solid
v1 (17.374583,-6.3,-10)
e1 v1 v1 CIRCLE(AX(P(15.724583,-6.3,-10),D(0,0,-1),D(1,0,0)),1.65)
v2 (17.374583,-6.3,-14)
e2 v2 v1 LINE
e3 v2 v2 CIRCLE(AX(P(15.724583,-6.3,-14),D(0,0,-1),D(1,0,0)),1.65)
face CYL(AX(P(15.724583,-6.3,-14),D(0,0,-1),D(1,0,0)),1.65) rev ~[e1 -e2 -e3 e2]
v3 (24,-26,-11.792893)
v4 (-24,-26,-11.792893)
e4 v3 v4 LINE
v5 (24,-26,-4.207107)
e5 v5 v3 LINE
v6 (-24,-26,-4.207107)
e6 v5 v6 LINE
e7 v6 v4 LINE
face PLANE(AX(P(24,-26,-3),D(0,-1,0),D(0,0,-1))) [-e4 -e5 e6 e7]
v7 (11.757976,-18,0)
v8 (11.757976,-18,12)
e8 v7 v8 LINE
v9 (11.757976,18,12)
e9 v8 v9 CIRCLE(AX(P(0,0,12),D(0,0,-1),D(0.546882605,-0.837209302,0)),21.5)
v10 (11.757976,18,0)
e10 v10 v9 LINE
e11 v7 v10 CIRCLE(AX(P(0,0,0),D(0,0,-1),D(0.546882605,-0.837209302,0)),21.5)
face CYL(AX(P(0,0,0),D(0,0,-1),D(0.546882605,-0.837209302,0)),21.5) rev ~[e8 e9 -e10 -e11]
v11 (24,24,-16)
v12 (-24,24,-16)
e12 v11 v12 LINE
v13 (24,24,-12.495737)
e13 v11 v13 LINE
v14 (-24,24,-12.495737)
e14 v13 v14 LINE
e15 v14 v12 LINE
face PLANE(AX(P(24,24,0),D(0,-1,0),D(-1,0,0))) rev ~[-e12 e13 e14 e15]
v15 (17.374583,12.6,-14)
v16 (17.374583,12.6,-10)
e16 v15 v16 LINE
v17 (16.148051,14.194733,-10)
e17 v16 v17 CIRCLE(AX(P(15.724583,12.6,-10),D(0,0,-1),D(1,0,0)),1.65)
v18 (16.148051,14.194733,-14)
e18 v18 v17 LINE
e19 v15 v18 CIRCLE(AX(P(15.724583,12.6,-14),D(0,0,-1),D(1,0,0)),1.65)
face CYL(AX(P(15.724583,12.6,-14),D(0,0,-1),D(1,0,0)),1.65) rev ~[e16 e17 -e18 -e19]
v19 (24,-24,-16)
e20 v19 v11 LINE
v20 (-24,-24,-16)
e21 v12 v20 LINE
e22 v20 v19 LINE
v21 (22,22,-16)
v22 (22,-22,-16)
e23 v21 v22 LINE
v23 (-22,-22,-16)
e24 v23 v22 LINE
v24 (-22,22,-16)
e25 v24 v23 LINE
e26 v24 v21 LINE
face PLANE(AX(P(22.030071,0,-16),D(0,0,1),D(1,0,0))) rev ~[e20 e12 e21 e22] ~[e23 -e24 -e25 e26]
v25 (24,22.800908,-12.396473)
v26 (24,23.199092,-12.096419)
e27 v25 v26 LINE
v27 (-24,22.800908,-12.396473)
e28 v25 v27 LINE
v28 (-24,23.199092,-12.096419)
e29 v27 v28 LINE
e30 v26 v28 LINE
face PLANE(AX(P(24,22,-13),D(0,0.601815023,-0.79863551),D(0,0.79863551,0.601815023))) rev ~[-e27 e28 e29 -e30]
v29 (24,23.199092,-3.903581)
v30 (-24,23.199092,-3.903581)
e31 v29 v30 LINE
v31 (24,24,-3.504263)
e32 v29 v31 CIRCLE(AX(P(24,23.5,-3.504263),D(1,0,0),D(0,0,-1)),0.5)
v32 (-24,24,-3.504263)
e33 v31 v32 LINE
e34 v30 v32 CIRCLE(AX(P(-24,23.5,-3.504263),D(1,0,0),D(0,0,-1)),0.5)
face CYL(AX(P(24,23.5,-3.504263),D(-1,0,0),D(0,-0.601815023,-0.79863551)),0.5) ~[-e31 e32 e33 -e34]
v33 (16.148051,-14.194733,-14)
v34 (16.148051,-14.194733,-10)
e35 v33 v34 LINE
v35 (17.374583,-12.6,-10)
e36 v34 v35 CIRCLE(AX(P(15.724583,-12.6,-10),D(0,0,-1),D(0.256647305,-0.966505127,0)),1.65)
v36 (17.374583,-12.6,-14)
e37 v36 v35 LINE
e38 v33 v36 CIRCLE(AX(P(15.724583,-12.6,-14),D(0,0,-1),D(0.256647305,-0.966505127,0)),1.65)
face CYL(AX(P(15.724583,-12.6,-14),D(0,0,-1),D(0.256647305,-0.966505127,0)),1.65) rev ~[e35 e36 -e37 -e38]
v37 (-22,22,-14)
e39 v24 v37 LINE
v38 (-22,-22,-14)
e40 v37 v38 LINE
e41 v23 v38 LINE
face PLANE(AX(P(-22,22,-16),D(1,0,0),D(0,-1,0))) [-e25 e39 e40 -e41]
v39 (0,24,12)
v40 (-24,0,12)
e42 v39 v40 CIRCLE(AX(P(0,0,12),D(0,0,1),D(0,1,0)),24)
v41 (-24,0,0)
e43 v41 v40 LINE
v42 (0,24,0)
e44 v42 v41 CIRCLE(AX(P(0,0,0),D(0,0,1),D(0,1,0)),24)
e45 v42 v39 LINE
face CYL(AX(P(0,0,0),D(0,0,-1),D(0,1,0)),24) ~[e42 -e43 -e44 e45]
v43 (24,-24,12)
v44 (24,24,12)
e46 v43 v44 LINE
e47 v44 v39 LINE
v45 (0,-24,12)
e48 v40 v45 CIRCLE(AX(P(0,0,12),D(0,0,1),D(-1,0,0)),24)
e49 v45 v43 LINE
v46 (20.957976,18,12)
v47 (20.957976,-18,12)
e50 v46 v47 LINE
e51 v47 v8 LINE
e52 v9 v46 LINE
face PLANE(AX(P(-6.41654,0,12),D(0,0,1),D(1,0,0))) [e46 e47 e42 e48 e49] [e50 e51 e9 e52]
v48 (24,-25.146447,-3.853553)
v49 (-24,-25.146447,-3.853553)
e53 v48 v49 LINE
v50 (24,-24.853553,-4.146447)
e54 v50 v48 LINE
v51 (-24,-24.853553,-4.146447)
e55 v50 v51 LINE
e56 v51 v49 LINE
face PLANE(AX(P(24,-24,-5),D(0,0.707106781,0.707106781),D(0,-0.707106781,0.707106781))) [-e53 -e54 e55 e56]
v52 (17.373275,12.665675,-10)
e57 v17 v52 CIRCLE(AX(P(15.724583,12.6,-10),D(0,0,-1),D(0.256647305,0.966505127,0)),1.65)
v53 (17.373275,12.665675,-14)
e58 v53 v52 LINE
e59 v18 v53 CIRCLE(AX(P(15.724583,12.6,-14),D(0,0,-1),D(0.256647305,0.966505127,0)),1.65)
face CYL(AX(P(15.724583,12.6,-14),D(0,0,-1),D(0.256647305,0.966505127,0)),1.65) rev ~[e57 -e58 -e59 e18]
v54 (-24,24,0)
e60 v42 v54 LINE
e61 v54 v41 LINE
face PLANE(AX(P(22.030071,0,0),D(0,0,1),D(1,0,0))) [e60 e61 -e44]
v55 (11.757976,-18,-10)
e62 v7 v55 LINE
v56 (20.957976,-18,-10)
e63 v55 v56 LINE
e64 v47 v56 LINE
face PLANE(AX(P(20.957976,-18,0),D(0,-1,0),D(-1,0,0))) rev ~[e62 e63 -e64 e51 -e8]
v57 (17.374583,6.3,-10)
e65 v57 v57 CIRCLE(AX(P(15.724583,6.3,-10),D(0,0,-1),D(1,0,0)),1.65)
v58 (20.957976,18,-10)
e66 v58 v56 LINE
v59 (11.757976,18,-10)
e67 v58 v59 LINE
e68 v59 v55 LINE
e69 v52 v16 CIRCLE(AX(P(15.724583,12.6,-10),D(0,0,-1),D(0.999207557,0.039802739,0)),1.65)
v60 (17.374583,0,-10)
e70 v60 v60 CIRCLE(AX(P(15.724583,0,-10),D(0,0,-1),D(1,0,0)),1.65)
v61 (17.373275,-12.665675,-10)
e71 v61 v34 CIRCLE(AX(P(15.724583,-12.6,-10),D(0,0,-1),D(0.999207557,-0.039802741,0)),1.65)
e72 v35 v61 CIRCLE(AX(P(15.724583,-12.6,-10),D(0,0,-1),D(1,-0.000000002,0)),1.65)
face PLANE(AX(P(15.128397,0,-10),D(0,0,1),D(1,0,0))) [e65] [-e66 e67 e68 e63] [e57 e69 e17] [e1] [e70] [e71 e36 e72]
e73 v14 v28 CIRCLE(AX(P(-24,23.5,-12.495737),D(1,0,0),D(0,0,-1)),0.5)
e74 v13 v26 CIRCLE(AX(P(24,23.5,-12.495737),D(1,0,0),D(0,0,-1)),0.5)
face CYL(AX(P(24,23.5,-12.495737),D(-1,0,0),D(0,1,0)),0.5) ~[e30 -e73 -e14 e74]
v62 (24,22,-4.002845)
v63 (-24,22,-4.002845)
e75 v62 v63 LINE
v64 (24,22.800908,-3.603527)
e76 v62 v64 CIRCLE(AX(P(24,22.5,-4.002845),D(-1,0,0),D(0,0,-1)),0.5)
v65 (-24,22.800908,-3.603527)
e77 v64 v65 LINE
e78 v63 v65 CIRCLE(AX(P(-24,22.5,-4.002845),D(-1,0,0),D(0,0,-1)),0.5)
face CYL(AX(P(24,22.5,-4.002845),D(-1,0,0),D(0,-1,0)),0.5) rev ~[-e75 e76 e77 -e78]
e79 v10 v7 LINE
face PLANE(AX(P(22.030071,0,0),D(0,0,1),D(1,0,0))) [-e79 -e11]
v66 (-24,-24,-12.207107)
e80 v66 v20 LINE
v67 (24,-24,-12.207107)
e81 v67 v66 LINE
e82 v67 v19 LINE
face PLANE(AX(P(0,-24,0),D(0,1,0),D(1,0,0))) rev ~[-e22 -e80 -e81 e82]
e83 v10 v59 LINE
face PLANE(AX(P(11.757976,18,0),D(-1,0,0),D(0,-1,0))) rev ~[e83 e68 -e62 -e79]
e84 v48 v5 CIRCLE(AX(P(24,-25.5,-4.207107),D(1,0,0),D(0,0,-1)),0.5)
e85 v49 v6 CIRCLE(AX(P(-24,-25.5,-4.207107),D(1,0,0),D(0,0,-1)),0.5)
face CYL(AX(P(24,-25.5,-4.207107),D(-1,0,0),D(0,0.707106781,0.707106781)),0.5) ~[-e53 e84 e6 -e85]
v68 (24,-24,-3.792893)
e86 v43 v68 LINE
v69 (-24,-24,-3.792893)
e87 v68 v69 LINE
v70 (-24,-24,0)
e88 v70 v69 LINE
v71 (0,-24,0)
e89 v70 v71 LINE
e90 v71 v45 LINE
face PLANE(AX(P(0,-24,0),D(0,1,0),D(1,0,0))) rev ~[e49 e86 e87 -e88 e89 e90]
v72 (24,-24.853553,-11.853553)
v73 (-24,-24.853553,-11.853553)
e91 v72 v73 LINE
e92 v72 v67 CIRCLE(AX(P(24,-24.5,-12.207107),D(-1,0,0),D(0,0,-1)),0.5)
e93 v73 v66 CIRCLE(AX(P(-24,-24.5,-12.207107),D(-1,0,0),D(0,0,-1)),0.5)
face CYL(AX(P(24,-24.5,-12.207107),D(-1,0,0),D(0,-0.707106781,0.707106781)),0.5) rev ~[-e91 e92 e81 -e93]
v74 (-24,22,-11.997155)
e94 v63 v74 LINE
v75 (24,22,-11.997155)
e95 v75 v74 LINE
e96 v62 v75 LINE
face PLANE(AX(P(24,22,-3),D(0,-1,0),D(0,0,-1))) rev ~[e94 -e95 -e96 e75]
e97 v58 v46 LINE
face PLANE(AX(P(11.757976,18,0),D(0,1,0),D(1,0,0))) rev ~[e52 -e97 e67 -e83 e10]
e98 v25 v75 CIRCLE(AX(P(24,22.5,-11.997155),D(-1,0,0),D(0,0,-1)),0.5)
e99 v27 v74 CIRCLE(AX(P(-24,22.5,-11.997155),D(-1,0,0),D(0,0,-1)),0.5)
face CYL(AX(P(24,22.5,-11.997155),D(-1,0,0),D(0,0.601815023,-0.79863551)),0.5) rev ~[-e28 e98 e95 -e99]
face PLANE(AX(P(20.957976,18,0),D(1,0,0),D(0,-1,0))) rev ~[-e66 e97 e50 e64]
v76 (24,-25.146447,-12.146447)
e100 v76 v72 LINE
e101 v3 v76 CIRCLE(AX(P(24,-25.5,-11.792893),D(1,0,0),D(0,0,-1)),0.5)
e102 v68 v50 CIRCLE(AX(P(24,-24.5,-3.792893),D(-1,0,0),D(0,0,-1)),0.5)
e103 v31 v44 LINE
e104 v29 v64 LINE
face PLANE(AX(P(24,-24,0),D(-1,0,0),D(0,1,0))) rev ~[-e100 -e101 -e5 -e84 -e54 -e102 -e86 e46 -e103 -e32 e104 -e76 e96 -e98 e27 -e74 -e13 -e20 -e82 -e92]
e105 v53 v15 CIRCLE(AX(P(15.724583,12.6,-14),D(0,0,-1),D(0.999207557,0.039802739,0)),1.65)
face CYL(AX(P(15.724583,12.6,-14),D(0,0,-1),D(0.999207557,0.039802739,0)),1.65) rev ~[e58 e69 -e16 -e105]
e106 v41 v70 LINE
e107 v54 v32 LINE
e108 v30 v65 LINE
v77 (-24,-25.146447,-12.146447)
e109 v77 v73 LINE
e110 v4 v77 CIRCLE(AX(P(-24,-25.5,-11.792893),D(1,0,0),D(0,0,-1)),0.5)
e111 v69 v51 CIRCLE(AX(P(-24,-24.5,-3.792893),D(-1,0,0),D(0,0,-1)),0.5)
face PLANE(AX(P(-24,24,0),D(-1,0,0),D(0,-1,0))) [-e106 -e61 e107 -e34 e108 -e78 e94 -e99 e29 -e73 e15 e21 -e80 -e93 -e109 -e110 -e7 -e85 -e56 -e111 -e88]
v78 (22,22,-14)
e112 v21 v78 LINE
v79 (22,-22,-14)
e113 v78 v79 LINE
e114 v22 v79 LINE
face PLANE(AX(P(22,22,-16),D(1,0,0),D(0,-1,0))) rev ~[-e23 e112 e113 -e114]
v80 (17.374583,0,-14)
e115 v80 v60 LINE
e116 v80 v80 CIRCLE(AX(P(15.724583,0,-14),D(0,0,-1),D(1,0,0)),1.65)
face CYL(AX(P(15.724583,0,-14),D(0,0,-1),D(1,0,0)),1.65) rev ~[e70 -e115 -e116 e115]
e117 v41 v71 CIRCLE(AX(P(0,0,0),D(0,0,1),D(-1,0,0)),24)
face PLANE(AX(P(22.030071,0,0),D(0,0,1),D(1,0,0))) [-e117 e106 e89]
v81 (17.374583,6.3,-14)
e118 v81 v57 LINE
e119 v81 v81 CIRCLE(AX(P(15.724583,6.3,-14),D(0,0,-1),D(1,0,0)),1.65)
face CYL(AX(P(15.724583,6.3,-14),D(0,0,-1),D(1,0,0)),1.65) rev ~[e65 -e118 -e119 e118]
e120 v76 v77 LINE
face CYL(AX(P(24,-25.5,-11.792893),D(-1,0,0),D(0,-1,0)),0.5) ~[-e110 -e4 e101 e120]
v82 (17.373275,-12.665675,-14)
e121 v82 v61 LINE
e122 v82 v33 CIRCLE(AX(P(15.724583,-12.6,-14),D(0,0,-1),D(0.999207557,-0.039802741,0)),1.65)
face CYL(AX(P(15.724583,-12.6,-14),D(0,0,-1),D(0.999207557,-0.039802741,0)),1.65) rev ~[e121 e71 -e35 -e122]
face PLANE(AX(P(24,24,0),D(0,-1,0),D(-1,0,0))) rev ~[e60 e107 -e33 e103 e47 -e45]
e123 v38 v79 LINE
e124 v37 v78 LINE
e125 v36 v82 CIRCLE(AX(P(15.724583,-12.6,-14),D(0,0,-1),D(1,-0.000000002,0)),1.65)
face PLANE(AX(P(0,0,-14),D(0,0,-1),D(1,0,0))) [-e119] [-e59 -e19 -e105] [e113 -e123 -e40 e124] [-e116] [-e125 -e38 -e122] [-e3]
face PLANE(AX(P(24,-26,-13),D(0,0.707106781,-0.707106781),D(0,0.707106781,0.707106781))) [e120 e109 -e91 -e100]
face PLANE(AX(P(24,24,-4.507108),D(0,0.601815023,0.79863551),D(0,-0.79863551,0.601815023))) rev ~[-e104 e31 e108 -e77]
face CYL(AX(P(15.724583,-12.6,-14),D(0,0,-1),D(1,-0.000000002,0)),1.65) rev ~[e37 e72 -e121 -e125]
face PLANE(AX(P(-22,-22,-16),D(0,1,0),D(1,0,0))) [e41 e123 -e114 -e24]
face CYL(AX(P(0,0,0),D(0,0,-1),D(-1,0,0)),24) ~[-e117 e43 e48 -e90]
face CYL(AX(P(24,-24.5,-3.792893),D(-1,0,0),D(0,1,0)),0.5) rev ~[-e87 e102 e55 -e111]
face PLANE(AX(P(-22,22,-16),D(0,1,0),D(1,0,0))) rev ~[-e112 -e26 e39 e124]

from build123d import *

# Parameters (mm, degrees)
F1_DEPTH  = 16
F2_DEPTH  = 12
F3_W      = 44
F3_H      = 44
F4_DEPTH  = 2
F5_R      = 1.65
F6_DEPTH  = 25
F8_DEPTH  = 48
F9_DEPTH  = 48
F10_R     = 0.5
F11_W     = 1.8
F11_H     = 2.1
F14_DEPTH = 10


# Not quite as in the source:
# - a feature names something its author has since deleted; it is built from what else it names


with BuildPart() as f1:
    # F0 (on Top) → F1 (new body)
    with BuildSketch(Plane.XY):
        with BuildLine():
            ThreePointArc((0, 24), (8.4852813742, 22.4499443206), (15.8745078664, 18))
            Line((15.8745078664, 18), (20.9579760163, 18))
            Line((20.9579760163, 18), (20.9579760163, 11.6945817069))
            ThreePointArc((20.9579760163, 11.6945817069), (23.2270469969, 6.0418778376), (24, 0))
            Line((24, 0), (24, 24))
            Line((24, 24), (0, 24))
        make_face()
        with BuildLine():
            Line((20.9579760163, -18), (15.8745078664, -18))
            ThreePointArc((15.8745078664, -18), (8.4852813742, -22.4499443206), (0, -24))
            Line((0, -24), (24, -24))
            Line((24, -24), (24, 0))
            ThreePointArc((24, 0), (23.2270469969, -6.0418778376), (20.9579760163, -11.6945817069))
            Line((20.9579760163, -11.6945817069), (20.9579760163, -18))
        make_face()
        with BuildLine():
            Line((15.8745078664, 18), (11.7579760163, 18))
            ThreePointArc((11.7579760163, 18), (17.6397784352, 12.2917946922), (20.9579760163, 4.7972118256))
            Line((20.9579760163, 4.7972118256), (20.9579760163, 11.6945817069))
            ThreePointArc((20.9579760163, 11.6945817069), (18.6841521671, 15.0632817737), (15.8745078664, 18))
        make_face()
        with BuildLine():
            ThreePointArc((11.7579760163, -18), (-21.5, 0), (11.7579760163, 18))
            Line((11.7579760163, 18), (15.8745078664, 18))
            ThreePointArc((15.8745078664, 18), (8.4852813742, 22.4499443206), (0, 24))
            ThreePointArc((0, 24), (-16.9705627485, 16.9705627485), (-24, 0))
            ThreePointArc((-24, 0), (-16.9705627485, -16.9705627485), (0, -24))
            ThreePointArc((0, -24), (8.4852813742, -22.4499443206), (15.8745078664, -18))
            Line((15.8745078664, -18), (11.7579760163, -18))
        make_face()
        with BuildLine():
            ThreePointArc((20.9579760163, -4.7972118256), (17.6397784352, -12.2917946922), (11.7579760163, -18))
            Line((11.7579760163, -18), (15.8745078664, -18))
            ThreePointArc((15.8745078664, -18), (18.6841521671, -15.0632817737), (20.9579760163, -11.6945817069))
            Line((20.9579760163, -11.6945817069), (20.9579760163, -4.7972118256))
        make_face()
        with BuildLine():
            Line((20.9579760163, 11.6945817069), (20.9579760163, 4.7972118256))
            ThreePointArc((20.9579760163, 4.7972118256), (21.364064271, 2.4138678143), (21.5, 0))
            ThreePointArc((21.5, 0), (21.364064271, -2.4138678143), (20.9579760163, -4.7972118256))
            Line((20.9579760163, -4.7972118256), (20.9579760163, -11.6945817069))
            ThreePointArc((20.9579760163, -11.6945817069), (23.2270469969, -6.0418778376), (24, 0))
            ThreePointArc((24, 0), (23.2270469969, 6.0418778376), (20.9579760163, 11.6945817069))
        make_face()
        with BuildLine():
            ThreePointArc((-24, 0), (-16.9705627485, 16.9705627485), (0, 24))
            Line((0, 24), (-24, 24))
            Line((-24, 24), (-24, 0))
        make_face()
        with BuildLine():
            Line((11.7579760163, -18), (11.7579760163, 18))
            ThreePointArc((11.7579760163, 18), (-21.5, 0), (11.7579760163, -18))
        make_face()
        with BuildLine():
            Line((-24, -24), (0, -24))
            ThreePointArc((0, -24), (-16.9705627485, -16.9705627485), (-24, 0))
            Line((-24, 0), (-24, -24))
        make_face()
        with BuildLine():
            Line((20.9579760163, 18), (15.8745078664, 18))
            ThreePointArc((15.8745078664, 18), (18.6841521671, 15.0632817737), (20.9579760163, 11.6945817069))
            Line((20.9579760163, 11.6945817069), (20.9579760163, 18))
        make_face()
        with BuildLine():
            ThreePointArc((20.9579760163, -11.6945817069), (18.6841521671, -15.0632817737), (15.8745078664, -18))
            Line((15.8745078664, -18), (20.9579760163, -18))
            Line((20.9579760163, -18), (20.9579760163, -11.6945817069))
        make_face()
        with BuildLine():
            ThreePointArc((21.5, 0), (21.364064271, 2.4138678143), (20.9579760163, 4.7972118256))
            Line((20.9579760163, 4.7972118256), (20.9579760163, -4.7972118256))
            ThreePointArc((20.9579760163, -4.7972118256), (21.364064271, -2.4138678143), (21.5, 0))
        make_face()
        with BuildLine():
            ThreePointArc((20.9579760163, 4.7972118256), (17.6397784352, 12.2917946922), (11.7579760163, 18))
            Line((11.7579760163, 18), (11.7579760163, -18))
            ThreePointArc((11.7579760163, -18), (17.6397784352, -12.2917946922), (20.9579760163, -4.7972118256))
            Line((20.9579760163, -4.7972118256), (20.9579760163, 4.7972118256))
        make_face()
    extrude(amount=-F1_DEPTH)

    # F0 (on Top) → F2 (join)
    with BuildSketch(Plane.XY):
        with BuildLine():
            ThreePointArc((11.7579760163, -18), (-21.5, 0), (11.7579760163, 18))
            Line((11.7579760163, 18), (15.8745078664, 18))
            ThreePointArc((15.8745078664, 18), (8.4852813742, 22.4499443206), (0, 24))
            ThreePointArc((0, 24), (-16.9705627485, 16.9705627485), (-24, 0))
            ThreePointArc((-24, 0), (-16.9705627485, -16.9705627485), (0, -24))
            ThreePointArc((0, -24), (8.4852813742, -22.4499443206), (15.8745078664, -18))
            Line((15.8745078664, -18), (11.7579760163, -18))
        make_face()
        with BuildLine():
            Line((20.9579760163, -18), (15.8745078664, -18))
            ThreePointArc((15.8745078664, -18), (8.4852813742, -22.4499443206), (0, -24))
            Line((0, -24), (24, -24))
            Line((24, -24), (24, 0))
            ThreePointArc((24, 0), (23.2270469969, -6.0418778376), (20.9579760163, -11.6945817069))
            Line((20.9579760163, -11.6945817069), (20.9579760163, -18))
        make_face()
        with BuildLine():
            Line((20.9579760163, 11.6945817069), (20.9579760163, 4.7972118256))
            ThreePointArc((20.9579760163, 4.7972118256), (21.364064271, 2.4138678143), (21.5, 0))
            ThreePointArc((21.5, 0), (21.364064271, -2.4138678143), (20.9579760163, -4.7972118256))
            Line((20.9579760163, -4.7972118256), (20.9579760163, -11.6945817069))
            ThreePointArc((20.9579760163, -11.6945817069), (23.2270469969, -6.0418778376), (24, 0))
            ThreePointArc((24, 0), (23.2270469969, 6.0418778376), (20.9579760163, 11.6945817069))
        make_face()
        with BuildLine():
            ThreePointArc((0, 24), (8.4852813742, 22.4499443206), (15.8745078664, 18))
            Line((15.8745078664, 18), (20.9579760163, 18))
            Line((20.9579760163, 18), (20.9579760163, 11.6945817069))
            ThreePointArc((20.9579760163, 11.6945817069), (23.2270469969, 6.0418778376), (24, 0))
            Line((24, 0), (24, 24))
            Line((24, 24), (0, 24))
        make_face()
        with BuildLine():
            ThreePointArc((21.5, 0), (21.364064271, 2.4138678143), (20.9579760163, 4.7972118256))
            Line((20.9579760163, 4.7972118256), (20.9579760163, -4.7972118256))
            ThreePointArc((20.9579760163, -4.7972118256), (21.364064271, -2.4138678143), (21.5, 0))
        make_face()
    extrude(amount=F2_DEPTH)

    # F3 (on face) → F4 (cut)
    with BuildSketch(Plane(origin=(0, 0, -16), x_dir=(1, 0, 0), z_dir=(0, 0, -1))):
        Rectangle(F3_W, F3_H)
    extrude(amount=-F4_DEPTH, mode=Mode.SUBTRACT)

    # F5 (on face) → F6 (cut)
    with BuildSketch(Plane(origin=(0, 0, -14), x_dir=(1, 0, 0), z_dir=(0, 0, -1))):
        with BuildLine():
            ThreePointArc((17.3732751343, 12.6656745224), (16.7780906851, 13.4441687345), (16.1480507184, 14.1947334599))
            ThreePointArc((16.1480507184, 14.1947334599), (14.4166793265, 11.5940731357), (17.3745826654, 12.6))
            ThreePointArc((17.3745826654, 12.6), (17.3742557502, 12.6328437686), (17.3732751343, 12.6656745224))
        make_face()
        with BuildLine():
            ThreePointArc((17.3732751343, 12.6656745224), (17.0122035784, 13.6317617866), (16.1480507184, 14.1947334599))
            ThreePointArc((16.1480507184, 14.1947334599), (16.7780906851, 13.4441687345), (17.3732751343, 12.6656745224))
        make_face()
        with Locations((15.7245826654, 6.3)):
            Circle(F5_R)
        with Locations((15.7245826654, 0)):
            Circle(F5_R)
        with Locations((15.7245826654, -6.3)):
            Circle(F5_R)
        with BuildLine():
            ThreePointArc((17.3732751343, -12.6656745224), (16.7780906851, -13.4441687345), (16.1480507184, -14.1947334599))
            ThreePointArc((16.1480507184, -14.1947334599), (17.0122035784, -13.6317617866), (17.3732751343, -12.6656745224))
        make_face()
        with BuildLine():
            ThreePointArc((17.3745826654, -12.6), (14.4166793265, -11.5940731357), (16.1480507184, -14.1947334599))
            ThreePointArc((16.1480507184, -14.1947334599), (16.7780906851, -13.4441687345), (17.3732751343, -12.6656745224))
            ThreePointArc((17.3732751343, -12.6656745224), (17.3742557502, -12.6328437686), (17.3745826654, -12.6))
        make_face()
    extrude(amount=-F6_DEPTH, mode=Mode.SUBTRACT)

    # F7 (on face) → F8 (join, through all)
    with BuildSketch(Plane.YZ.offset(24)):
        Polygon((-26, -13), (-24, -11), (-24, -5), (-26, -3), align=None)
    extrude(amount=-F8_DEPTH)

    # F7 (on face) → F9 (cut, through all)
    with BuildSketch(Plane.YZ.offset(24)):
        Polygon((22, -13), (24, -11.4928918998), (24, -4.5071081002), (22, -3), align=None)
    extrude(amount=-F9_DEPTH, mode=Mode.SUBTRACT)

    # F10
    f10_edges = [f1.edges().sort_by_distance(p)[0] for p in [
        (0, -26, -13),
        (0, -26, -3),
        (0, 22, -3),
        (0, 22, -13),
        (0, 24, -4.507108),
        (0, 24, -11.492892),
        (0, -24, -5),
        (0, -24, -11),
    ]]
    fillet(f10_edges, radius=F10_R)

    # F11 (on Front) → F12 (revolve, cut)
    with BuildSketch(Plane.XZ):
        with Locations((12.6579760163, 5.05)):
            Rectangle(F11_W, F11_H)
    revolve(axis=Axis((0, 0, 12), (0, 0, -1)), mode=Mode.SUBTRACT)

    # F0 (on Top) + F13 (on face) → F14 (cut)
    with BuildSketch(Plane.XY):
        with BuildLine():
            ThreePointArc((20.9579760163, 4.7972118256), (17.6397784352, 12.2917946922), (11.7579760163, 18))
            Line((11.7579760163, 18), (11.7579760163, -18))
            ThreePointArc((11.7579760163, -18), (17.6397784352, -12.2917946922), (20.9579760163, -4.7972118256))
            Line((20.9579760163, -4.7972118256), (20.9579760163, 4.7972118256))
        make_face()
        with BuildLine():
            ThreePointArc((20.9579760163, -4.7972118256), (17.6397784352, -12.2917946922), (11.7579760163, -18))
            Line((11.7579760163, -18), (15.8745078664, -18))
            ThreePointArc((15.8745078664, -18), (18.6841521671, -15.0632817737), (20.9579760163, -11.6945817069))
            Line((20.9579760163, -11.6945817069), (20.9579760163, -4.7972118256))
        make_face()
        with BuildLine():
            ThreePointArc((20.9579760163, -11.6945817069), (18.6841521671, -15.0632817737), (15.8745078664, -18))
            Line((15.8745078664, -18), (20.9579760163, -18))
            Line((20.9579760163, -18), (20.9579760163, -11.6945817069))
        make_face()
    with BuildSketch(Plane.XY):
        with BuildLine():
            Line((20.9579760163, 18), (11.7579760163, 18))
            ThreePointArc((11.7579760163, 18), (17.6397784352, 12.2917946922), (20.9579760163, 4.7972118256))
            Line((20.9579760163, 4.7972118256), (20.9579760163, 18))
        make_face()
    extrude(amount=-F14_DEPTH, mode=Mode.SUBTRACT)


solid = f1.part
